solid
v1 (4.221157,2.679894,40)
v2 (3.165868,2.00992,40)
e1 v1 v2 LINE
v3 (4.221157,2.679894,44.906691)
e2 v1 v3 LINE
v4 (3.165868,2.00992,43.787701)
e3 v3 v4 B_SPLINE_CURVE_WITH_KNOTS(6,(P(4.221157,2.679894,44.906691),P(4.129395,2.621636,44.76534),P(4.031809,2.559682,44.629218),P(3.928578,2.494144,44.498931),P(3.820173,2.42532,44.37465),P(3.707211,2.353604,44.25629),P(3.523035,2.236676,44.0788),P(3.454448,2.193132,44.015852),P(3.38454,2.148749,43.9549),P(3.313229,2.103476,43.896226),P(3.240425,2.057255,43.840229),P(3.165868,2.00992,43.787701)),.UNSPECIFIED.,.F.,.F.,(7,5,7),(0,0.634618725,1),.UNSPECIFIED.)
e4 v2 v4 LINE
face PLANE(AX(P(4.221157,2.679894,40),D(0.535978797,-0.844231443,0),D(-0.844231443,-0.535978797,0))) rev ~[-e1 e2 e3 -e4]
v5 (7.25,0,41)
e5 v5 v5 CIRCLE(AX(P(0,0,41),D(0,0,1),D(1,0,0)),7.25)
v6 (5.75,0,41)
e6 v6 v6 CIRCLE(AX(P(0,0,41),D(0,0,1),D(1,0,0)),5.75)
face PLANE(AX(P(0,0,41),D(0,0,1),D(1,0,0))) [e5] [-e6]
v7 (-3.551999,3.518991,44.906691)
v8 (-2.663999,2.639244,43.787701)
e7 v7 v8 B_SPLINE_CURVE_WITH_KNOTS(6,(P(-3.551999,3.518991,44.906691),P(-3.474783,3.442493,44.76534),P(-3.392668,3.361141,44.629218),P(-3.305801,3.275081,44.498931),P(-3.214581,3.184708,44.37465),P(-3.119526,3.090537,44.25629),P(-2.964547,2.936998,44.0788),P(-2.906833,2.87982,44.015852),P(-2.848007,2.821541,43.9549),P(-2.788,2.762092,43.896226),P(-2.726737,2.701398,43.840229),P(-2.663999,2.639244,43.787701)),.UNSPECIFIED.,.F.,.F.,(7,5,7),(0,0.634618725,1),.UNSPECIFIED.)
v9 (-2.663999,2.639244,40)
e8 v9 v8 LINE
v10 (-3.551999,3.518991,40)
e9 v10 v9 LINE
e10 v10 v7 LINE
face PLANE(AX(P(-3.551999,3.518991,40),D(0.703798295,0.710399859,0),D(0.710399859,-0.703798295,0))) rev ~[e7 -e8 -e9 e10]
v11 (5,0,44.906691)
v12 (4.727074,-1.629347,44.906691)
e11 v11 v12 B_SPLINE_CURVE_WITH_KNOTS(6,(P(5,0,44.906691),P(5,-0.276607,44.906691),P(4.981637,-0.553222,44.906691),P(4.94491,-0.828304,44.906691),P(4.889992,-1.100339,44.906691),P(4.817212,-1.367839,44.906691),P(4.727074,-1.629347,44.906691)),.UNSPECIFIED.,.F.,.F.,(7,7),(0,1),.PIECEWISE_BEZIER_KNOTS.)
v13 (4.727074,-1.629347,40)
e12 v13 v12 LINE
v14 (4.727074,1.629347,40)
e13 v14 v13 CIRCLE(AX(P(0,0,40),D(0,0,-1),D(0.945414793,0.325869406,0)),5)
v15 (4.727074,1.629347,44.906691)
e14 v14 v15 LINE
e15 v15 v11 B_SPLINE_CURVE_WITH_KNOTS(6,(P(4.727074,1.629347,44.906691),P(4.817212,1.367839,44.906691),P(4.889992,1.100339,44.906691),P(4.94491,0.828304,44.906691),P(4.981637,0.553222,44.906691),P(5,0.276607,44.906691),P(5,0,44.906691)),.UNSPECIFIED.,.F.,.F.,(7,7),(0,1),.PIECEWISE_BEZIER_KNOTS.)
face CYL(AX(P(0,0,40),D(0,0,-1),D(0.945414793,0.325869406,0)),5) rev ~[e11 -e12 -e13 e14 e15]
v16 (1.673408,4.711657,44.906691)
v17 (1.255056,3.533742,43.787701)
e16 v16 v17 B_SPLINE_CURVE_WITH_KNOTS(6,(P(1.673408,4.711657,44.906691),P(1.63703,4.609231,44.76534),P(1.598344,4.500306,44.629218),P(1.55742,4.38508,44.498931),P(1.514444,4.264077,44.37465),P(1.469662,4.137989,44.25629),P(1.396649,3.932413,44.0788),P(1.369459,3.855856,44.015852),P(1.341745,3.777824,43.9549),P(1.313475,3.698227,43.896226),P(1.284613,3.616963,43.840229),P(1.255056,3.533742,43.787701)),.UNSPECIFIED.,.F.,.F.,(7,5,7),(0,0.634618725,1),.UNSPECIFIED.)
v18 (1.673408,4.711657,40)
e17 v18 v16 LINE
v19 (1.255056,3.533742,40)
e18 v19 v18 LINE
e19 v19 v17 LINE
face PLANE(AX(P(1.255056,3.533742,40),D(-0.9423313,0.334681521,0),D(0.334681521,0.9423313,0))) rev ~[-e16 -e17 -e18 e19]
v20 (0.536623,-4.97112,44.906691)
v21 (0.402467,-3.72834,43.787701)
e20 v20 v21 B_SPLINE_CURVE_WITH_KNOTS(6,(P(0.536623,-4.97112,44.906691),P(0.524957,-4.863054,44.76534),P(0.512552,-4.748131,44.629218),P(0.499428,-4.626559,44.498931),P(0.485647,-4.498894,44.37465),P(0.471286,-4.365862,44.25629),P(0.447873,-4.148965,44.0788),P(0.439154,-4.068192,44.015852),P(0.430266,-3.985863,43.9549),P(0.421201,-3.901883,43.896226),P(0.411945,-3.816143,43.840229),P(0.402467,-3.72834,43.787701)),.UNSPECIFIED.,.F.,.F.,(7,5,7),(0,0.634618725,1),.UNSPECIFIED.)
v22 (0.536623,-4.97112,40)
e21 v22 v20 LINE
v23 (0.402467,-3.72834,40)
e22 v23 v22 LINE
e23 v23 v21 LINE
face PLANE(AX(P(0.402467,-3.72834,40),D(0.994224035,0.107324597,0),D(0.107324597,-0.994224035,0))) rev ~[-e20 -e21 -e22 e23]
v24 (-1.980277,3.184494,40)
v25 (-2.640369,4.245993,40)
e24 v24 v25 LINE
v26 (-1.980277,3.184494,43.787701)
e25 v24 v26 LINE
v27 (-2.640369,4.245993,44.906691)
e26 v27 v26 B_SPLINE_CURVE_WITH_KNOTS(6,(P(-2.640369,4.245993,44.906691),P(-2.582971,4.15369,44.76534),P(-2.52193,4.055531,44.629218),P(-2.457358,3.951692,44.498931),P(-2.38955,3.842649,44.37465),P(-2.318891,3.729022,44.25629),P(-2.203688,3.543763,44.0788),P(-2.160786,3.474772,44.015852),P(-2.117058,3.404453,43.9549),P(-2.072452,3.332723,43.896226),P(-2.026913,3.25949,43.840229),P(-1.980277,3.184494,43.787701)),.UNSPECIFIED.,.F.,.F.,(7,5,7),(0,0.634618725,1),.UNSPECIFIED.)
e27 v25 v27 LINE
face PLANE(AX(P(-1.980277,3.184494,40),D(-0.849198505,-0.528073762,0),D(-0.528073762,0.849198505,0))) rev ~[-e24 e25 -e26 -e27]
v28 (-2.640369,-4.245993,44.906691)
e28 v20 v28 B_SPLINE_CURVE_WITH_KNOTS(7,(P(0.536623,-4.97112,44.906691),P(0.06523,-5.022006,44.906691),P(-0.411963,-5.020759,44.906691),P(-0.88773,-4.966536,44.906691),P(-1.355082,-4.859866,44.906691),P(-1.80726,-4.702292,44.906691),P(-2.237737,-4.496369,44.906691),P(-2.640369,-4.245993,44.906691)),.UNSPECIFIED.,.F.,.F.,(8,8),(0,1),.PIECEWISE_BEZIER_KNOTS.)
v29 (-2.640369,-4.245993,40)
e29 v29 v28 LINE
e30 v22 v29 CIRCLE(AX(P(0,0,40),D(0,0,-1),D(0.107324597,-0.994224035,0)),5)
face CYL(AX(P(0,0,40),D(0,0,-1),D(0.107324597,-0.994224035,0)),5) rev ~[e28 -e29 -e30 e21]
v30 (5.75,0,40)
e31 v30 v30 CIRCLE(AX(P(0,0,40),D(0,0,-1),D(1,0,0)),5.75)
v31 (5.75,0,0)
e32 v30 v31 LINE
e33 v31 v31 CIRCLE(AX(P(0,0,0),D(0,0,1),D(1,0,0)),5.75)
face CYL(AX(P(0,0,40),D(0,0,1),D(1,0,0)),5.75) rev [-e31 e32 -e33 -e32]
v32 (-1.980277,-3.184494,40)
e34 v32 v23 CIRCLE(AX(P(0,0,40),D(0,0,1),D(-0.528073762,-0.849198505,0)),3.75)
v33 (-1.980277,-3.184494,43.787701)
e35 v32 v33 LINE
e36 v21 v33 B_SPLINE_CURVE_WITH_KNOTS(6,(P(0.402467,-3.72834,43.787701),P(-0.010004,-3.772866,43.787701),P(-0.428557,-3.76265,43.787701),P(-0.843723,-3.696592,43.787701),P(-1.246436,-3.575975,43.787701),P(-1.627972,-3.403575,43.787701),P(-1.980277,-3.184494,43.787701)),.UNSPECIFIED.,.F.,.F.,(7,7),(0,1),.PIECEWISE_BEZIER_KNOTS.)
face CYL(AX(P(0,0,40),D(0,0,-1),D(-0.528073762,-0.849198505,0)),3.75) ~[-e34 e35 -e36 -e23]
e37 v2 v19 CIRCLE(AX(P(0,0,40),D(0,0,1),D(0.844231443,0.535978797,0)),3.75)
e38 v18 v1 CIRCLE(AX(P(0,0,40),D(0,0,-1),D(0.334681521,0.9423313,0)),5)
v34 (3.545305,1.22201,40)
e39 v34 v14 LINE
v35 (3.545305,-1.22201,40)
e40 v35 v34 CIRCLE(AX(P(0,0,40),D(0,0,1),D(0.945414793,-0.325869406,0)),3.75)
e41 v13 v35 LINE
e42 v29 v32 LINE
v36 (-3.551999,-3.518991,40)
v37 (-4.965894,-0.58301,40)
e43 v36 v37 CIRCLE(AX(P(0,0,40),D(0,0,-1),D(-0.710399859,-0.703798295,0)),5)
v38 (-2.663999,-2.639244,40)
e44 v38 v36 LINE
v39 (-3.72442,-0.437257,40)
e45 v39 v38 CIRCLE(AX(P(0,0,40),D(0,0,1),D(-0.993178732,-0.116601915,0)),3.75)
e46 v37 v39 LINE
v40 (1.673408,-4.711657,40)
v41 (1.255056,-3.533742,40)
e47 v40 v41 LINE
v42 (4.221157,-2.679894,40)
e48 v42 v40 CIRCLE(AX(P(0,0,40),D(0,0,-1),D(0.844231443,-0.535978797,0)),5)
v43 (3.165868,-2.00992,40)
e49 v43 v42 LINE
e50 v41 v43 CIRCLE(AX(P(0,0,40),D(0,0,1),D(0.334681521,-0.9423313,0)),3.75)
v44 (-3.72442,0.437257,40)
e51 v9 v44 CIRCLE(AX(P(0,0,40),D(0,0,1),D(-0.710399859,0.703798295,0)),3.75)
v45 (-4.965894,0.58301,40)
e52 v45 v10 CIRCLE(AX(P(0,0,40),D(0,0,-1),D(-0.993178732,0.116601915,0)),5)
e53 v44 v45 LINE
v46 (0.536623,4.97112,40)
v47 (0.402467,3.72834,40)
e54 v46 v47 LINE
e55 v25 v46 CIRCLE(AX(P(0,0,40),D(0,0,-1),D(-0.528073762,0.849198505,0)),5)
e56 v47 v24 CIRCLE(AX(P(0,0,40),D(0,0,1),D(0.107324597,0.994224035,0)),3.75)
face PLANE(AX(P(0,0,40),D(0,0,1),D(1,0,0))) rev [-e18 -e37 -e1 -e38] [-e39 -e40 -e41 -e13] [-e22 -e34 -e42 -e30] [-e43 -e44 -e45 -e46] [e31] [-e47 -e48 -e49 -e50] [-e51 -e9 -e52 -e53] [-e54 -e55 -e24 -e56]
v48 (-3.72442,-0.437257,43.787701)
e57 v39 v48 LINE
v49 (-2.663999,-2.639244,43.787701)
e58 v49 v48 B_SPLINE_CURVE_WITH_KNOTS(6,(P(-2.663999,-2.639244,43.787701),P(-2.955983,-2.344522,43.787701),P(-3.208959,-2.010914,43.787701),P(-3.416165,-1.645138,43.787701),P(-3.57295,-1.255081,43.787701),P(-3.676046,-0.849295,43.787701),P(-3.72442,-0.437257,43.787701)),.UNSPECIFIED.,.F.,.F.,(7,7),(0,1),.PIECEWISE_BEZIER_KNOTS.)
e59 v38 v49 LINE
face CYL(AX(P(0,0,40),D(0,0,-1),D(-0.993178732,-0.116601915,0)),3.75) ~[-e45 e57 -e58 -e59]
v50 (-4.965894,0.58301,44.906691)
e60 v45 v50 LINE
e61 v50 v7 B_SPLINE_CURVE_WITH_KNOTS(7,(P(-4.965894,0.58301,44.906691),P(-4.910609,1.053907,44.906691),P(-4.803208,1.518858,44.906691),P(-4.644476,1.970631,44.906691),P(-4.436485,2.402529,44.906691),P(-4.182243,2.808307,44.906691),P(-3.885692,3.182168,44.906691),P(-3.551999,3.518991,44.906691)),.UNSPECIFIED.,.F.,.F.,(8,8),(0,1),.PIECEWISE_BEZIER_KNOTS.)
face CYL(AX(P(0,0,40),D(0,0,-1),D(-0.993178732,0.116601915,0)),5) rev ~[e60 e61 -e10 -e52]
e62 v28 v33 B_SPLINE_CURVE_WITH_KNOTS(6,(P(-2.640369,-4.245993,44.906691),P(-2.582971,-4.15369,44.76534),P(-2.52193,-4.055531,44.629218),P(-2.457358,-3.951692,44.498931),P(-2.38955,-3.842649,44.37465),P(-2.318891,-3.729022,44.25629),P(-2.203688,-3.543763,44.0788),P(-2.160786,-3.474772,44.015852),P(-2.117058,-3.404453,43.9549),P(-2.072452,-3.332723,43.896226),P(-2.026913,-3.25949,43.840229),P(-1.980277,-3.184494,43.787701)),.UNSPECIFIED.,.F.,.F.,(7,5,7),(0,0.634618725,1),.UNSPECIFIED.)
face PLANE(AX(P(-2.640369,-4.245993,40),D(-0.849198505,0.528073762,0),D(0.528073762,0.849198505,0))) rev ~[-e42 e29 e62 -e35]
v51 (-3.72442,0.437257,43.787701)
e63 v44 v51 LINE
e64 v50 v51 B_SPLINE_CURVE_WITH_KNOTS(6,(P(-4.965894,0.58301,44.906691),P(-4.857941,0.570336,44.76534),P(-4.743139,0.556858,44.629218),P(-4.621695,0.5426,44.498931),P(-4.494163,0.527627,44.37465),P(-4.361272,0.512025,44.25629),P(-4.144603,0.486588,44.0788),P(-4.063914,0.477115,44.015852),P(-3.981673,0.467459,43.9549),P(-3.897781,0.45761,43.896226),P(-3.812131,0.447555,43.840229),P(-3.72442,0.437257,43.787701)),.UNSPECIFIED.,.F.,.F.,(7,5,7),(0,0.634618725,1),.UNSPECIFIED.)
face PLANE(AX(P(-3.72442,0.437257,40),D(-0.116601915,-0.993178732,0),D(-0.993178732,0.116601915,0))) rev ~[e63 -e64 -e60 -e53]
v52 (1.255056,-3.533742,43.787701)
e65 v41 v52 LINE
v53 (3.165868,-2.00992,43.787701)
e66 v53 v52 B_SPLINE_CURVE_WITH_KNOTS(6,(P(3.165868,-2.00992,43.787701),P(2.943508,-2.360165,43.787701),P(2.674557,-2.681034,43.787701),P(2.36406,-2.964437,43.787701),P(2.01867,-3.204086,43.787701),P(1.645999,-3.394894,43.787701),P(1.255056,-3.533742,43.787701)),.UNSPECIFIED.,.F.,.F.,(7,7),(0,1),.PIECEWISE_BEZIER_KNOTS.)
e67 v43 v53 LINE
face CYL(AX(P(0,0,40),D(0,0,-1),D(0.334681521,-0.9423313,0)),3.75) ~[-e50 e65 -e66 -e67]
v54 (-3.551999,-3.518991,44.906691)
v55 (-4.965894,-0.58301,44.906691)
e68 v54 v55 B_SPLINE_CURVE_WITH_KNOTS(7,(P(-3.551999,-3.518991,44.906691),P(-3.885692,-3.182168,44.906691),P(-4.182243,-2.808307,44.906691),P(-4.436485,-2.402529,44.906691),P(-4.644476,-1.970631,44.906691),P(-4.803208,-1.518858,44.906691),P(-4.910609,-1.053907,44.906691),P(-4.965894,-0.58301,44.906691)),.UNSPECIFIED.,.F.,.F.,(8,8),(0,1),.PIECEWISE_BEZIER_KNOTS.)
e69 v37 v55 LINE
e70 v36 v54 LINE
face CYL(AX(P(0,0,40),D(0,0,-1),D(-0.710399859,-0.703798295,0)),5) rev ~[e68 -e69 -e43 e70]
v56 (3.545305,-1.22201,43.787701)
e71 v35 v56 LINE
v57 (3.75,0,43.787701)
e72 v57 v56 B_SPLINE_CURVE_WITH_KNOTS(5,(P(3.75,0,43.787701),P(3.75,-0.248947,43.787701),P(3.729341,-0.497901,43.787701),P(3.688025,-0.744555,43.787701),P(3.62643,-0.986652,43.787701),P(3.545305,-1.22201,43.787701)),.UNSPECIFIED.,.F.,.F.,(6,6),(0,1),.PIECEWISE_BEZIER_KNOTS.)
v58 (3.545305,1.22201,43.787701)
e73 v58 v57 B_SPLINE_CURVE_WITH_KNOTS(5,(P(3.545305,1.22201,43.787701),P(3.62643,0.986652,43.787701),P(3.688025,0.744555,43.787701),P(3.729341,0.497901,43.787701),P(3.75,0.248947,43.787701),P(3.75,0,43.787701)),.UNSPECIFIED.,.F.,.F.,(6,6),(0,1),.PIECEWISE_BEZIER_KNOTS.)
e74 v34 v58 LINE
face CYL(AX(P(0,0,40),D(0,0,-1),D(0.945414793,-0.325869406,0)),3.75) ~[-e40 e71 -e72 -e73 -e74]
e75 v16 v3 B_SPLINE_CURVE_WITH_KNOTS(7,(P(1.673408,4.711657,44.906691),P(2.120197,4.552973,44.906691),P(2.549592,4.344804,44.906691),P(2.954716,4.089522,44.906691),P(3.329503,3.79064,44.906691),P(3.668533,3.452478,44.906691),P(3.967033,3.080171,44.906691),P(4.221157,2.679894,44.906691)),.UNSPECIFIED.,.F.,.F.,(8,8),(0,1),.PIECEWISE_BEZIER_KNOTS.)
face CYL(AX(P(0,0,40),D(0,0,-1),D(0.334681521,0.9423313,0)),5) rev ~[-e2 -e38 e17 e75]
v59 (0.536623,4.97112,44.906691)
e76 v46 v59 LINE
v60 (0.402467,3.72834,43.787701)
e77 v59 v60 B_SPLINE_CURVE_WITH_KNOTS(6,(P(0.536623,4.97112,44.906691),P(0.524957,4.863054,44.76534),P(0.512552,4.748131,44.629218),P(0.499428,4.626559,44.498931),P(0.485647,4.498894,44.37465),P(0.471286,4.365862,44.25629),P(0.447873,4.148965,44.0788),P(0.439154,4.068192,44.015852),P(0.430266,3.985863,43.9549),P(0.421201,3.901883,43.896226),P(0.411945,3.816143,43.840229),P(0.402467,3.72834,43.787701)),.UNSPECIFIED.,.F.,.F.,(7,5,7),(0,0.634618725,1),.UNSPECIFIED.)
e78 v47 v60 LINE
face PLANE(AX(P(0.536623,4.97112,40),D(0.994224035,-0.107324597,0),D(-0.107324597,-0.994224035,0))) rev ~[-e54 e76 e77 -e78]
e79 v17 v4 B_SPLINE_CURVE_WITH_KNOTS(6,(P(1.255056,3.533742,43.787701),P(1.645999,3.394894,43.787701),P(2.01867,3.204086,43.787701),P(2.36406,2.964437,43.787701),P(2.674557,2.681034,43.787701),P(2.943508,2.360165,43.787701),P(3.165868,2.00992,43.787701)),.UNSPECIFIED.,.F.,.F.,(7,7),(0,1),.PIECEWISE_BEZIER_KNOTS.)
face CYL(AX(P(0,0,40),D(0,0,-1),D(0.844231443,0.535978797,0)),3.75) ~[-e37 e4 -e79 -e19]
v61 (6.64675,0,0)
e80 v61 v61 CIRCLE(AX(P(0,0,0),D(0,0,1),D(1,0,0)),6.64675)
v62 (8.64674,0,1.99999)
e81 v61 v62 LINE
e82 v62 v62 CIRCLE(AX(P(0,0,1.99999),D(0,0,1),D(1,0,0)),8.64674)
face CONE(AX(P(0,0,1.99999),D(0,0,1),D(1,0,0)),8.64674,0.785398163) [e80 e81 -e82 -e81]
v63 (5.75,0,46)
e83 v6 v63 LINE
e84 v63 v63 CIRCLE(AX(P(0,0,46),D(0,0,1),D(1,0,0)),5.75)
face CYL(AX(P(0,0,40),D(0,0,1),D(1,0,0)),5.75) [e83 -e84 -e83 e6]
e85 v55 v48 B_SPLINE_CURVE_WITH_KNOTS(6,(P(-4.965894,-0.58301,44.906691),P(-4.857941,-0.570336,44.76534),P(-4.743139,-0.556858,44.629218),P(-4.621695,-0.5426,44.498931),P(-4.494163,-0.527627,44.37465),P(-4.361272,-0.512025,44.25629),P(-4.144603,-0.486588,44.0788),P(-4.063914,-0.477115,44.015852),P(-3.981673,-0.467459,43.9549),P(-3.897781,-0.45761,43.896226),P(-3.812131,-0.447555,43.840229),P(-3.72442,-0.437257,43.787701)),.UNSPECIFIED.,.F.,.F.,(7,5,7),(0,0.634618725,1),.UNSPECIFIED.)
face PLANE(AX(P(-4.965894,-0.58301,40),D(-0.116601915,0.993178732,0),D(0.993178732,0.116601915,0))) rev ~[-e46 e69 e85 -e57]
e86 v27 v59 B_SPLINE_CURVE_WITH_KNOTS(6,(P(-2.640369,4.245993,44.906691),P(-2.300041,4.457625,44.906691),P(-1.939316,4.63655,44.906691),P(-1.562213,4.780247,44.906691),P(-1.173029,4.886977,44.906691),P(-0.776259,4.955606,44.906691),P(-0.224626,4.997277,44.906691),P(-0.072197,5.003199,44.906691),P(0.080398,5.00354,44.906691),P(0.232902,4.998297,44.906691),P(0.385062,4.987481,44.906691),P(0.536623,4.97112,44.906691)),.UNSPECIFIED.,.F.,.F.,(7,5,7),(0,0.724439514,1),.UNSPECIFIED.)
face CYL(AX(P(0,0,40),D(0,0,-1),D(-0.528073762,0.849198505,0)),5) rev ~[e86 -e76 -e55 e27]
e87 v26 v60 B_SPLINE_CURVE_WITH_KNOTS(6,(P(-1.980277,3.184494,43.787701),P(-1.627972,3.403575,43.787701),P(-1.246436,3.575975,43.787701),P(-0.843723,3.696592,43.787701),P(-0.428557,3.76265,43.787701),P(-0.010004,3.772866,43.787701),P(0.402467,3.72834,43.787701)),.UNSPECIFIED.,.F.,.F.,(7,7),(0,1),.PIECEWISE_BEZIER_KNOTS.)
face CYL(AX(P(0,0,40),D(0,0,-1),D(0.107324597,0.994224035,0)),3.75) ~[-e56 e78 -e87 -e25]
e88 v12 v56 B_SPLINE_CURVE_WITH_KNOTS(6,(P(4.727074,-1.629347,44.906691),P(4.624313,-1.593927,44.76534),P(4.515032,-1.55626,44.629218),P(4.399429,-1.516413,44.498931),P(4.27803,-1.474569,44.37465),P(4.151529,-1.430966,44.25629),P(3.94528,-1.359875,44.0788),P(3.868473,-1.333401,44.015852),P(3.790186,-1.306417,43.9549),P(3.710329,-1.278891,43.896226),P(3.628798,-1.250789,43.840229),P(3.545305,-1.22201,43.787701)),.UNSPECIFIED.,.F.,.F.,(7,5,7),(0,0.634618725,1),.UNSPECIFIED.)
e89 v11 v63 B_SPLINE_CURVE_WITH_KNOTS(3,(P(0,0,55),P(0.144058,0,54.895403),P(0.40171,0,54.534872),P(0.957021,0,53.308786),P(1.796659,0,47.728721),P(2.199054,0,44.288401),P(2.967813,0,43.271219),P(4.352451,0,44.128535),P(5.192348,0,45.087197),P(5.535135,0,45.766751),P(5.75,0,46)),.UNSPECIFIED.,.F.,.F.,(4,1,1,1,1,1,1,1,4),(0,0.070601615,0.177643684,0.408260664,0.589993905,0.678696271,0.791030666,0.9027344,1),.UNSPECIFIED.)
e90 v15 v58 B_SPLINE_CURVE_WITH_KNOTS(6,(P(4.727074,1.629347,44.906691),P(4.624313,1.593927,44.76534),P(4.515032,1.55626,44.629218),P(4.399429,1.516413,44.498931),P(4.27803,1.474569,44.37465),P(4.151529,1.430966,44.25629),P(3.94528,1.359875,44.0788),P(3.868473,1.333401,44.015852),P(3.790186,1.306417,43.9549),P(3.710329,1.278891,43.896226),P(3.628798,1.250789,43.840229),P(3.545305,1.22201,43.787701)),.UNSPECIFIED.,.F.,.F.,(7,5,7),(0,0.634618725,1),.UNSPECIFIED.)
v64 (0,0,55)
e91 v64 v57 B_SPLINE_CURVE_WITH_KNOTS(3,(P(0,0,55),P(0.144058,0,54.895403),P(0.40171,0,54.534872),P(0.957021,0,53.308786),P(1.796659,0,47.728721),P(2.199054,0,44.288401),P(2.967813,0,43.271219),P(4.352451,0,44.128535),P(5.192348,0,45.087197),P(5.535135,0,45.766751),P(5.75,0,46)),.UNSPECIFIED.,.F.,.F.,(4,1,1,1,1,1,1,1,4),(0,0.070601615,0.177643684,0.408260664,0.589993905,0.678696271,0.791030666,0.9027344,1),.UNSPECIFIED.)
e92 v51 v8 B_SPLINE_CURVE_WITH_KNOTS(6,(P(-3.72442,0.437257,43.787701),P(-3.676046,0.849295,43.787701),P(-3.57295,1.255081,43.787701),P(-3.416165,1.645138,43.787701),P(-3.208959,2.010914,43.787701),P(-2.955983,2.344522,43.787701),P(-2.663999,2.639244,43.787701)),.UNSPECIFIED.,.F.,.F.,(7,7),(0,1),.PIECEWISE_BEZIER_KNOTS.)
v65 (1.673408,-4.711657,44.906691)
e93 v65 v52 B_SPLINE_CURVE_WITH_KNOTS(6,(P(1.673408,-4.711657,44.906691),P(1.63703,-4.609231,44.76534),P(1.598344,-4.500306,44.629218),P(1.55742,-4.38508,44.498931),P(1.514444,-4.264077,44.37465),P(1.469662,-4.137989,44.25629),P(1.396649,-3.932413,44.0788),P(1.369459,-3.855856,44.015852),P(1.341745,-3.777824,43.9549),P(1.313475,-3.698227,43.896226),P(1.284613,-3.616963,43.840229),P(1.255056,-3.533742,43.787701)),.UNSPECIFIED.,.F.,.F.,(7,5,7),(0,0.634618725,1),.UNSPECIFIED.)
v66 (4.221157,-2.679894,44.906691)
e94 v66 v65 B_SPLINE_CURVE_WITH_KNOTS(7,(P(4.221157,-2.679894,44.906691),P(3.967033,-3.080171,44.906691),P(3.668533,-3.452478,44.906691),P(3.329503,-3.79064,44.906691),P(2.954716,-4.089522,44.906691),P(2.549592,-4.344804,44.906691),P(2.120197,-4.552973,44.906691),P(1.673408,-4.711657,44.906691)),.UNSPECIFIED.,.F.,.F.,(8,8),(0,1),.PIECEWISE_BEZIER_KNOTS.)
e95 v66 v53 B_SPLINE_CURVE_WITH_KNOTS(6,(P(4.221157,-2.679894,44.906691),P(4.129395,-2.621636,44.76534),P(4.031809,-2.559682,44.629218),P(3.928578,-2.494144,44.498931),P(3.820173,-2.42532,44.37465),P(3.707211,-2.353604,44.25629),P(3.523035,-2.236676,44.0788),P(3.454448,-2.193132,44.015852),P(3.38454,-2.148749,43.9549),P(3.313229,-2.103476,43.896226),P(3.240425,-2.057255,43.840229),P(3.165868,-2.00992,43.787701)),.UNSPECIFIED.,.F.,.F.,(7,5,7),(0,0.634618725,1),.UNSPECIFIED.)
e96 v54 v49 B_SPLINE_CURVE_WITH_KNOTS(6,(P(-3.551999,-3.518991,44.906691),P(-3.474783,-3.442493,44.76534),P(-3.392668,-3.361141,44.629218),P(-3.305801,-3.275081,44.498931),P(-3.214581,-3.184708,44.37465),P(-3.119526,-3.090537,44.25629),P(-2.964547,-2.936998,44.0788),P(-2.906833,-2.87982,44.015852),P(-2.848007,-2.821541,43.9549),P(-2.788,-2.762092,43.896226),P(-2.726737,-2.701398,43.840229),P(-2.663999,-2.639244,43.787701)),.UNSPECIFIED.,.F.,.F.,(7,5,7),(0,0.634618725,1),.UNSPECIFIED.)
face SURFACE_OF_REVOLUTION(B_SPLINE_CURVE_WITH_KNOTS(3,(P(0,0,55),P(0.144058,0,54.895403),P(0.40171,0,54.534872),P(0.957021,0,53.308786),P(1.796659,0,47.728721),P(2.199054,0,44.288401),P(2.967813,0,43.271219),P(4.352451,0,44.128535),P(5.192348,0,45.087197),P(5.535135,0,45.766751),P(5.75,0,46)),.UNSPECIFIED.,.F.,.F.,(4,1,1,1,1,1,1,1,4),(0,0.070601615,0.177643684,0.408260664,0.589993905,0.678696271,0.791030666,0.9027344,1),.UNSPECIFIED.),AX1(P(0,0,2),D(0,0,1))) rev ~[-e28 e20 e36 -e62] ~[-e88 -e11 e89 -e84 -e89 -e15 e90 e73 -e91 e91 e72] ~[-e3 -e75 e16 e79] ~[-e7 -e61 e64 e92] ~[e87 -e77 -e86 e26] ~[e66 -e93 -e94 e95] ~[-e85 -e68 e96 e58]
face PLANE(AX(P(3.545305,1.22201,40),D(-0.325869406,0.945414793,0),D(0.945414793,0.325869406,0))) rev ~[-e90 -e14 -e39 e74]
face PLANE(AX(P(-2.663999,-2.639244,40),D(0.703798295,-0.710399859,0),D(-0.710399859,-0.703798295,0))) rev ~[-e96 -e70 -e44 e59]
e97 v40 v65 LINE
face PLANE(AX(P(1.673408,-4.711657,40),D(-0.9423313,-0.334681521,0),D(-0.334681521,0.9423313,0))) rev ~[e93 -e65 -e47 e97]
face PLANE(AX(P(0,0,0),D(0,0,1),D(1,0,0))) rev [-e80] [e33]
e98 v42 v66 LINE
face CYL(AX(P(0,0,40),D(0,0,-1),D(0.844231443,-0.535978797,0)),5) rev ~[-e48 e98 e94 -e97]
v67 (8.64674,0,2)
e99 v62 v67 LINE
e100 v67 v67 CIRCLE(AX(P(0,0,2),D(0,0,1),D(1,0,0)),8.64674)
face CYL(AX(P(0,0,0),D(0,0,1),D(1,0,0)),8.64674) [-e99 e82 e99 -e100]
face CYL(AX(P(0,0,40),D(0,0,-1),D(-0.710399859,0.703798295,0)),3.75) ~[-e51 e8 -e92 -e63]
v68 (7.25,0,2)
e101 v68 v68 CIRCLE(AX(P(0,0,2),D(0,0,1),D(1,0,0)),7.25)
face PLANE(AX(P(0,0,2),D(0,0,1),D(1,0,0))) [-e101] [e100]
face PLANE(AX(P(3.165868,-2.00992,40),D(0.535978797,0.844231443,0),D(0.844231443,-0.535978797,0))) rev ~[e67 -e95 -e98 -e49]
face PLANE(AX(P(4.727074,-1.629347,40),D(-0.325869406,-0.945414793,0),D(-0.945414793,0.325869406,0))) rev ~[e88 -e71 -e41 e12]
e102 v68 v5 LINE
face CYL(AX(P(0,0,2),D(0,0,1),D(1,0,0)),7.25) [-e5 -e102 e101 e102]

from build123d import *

# Parameters (mm, degrees)
F2_SIZE2  = 1.99999
F2_SIZE   = 1.99999
F5_R      = 5.75
F6_DEPTH  = 25
F7_R      = 5.75
F8_DEPTH  = 25
F10_DEPTH = 25


# Not quite as in the source:
# - a fillet or chamfer is up to 0.001 mm smaller than in the source, because OpenCascade refuses the exact size


with BuildPart() as f1:
    # F0 (on Front) → F1 (revolve)
    with BuildSketch(Plane.XZ):
        with BuildLine():
            Line((8.64674, 2), (7.25, 2))
            Line((7.25, 2), (7.25, 41))
            Line((7.25, 41), (5.75, 41))
            Line((5.75, 41), (5.75, 40))
            Line((5.75, 40), (4.75, 40))
            Line((4.75, 40), (4.75, 39))
            ThreePointArc((4.75, 39), (5.4571067812, 38.7071067812), (5.75, 38))
            Line((5.75, 38), (5.75, 4.9999998882))
            ThreePointArc((5.75, 4.9999998882), (5.4571067812, 4.2928931071), (4.75, 3.9999998882))
            Line((4.75, 3.9999998882), (4.75, 2.9999998882))
            Line((4.75, 2.9999998882), (5.75, 2.9999998882))
            Line((5.75, 2.9999998882), (5.75, 0))
            Line((5.75, 0), (8.64674, 0))
            Line((8.64674, 0), (8.64674, 2))
        make_face()
    revolve(axis=Axis((0, 0, 27.7979653329), (0, 0, 1)))

    # F2 (size 2 and 2 in the source; OpenCascade refuses exactly that, so slightly less here)
    f2_edges = [f1.edges().sort_by_distance(p)[0] for p in [
        (-8.64674, 0, 0),
    ]]
    chamfer(f2_edges, length=F2_SIZE, length2=F2_SIZE2)

    # F3 (on Front) → F4 (revolve)
    with BuildSketch(Plane.XZ):
        with BuildLine():
            Line((0, 55), (0, 41))
            Line((0, 41), (0, 40))
            Line((0, 40), (5.75, 40))
            Line((5.75, 40), (5.75, 46))
            add(Edge.make_bspline(
                [(0, 55), (0.1440579667, 54.8954034218), (0.4017096448, 54.5348723025), (0.9570213075, 53.3087861702), (1.7966593586, 47.7287211885), (2.1990543329, 44.2884011591), (2.9678127556, 43.2712194265), (4.3524509198, 44.1285353141), (5.1923480343, 45.0871969322), (5.5351351682, 45.7667505271), (5.75, 46)],
                knots=[0, 0, 0, 0, 0.0706016145, 0.1776436842, 0.4082606642, 0.5899939047, 0.6786962714, 0.7910306665, 0.9027344001, 1, 1, 1, 1], degree=3))
        make_face()
    revolve(axis=Axis((0, 0, 2), (0, 0, 1)))

    # F5 (on face) → F6 (cut)
    with BuildSketch(Plane(origin=(0, 0, 40), x_dir=(1, 0, 0), z_dir=(0, 0, -1))):
        Circle(F5_R)
    extrude(amount=F6_DEPTH, mode=Mode.SUBTRACT)

    # F7 (on face) → F8 (cut)
    with BuildSketch(Plane(origin=(0, 0, 2.9999998882), x_dir=(1, 0, 0), z_dir=(0, 0, -1))):
        Circle(F7_R)
    extrude(amount=-F8_DEPTH, mode=Mode.SUBTRACT)

    # F9 (on face) → F10 (cut)
    with BuildSketch(Plane(origin=(0, 0, 40), x_dir=(1, 0, 0), z_dir=(0, 0, -1))):
        with BuildLine():
            ThreePointArc((3.5453054724, 1.222010273), (3.75, 0), (3.5453054724, -1.222010273))
            Line((3.5453054724, -1.222010273), (4.7270739632, -1.6293470307))
            ThreePointArc((4.7270739632, -1.6293470307), (5, 0), (4.7270739632, 1.6293470307))
            Line((4.7270739632, 1.6293470307), (3.5453054724, 1.222010273))
        make_face()
        with BuildLine():
            Line((3.1658679099, 2.0099204903), (4.2211572131, 2.6798939871))
            ThreePointArc((4.2211572131, 2.6798939871), (3.1174490093, 3.9091574123), (1.6734076042, 4.7116565017))
            Line((1.6734076042, 4.7116565017), (1.2550557032, 3.5337423763))
            ThreePointArc((1.2550557032, 3.5337423763), (2.338086757, 2.9318680593), (3.1658679099, 2.0099204903))
        make_face()
        with BuildLine():
            Line((0.4024672392, 3.7283401295), (0.5366229857, 4.9711201727))
            ThreePointArc((0.5366229857, 4.9711201727), (-1.1126046698, 4.8746395609), (-2.640368812, 4.2459925267))
            Line((-2.640368812, 4.2459925267), (-1.980276609, 3.184494395))
            ThreePointArc((-1.980276609, 3.184494395), (-0.8344535023, 3.6559796707), (0.4024672392, 3.7283401295))
        make_face()
        with BuildLine():
            Line((-2.6639994714, 2.6392436069), (-3.5519992951, 3.5189914759))
            ThreePointArc((-3.5519992951, 3.5189914759), (-4.5048443395, 2.1694186956), (-4.9658936591, 0.5830095766))
            Line((-4.9658936591, 0.5830095766), (-3.7244202443, 0.4372571824))
            ThreePointArc((-3.7244202443, 0.4372571824), (-3.3786332546, 1.6270640217), (-2.6639994714, 2.6392436069))
        make_face()
        with BuildLine():
            Line((-3.7244202443, -0.4372571824), (-4.9658936591, -0.5830095766))
            ThreePointArc((-4.9658936591, -0.5830095766), (-4.5048443395, -2.1694186956), (-3.5519992951, -3.5189914759))
            Line((-3.5519992951, -3.5189914759), (-2.6639994714, -2.6392436069))
            ThreePointArc((-2.6639994714, -2.6392436069), (-3.3786332546, -1.6270640217), (-3.7244202443, -0.4372571824))
        make_face()
        with BuildLine():
            Line((-1.980276609, -3.184494395), (-2.640368812, -4.2459925267))
            ThreePointArc((-2.640368812, -4.2459925267), (-1.1126046698, -4.8746395609), (0.5366229857, -4.9711201727))
            Line((0.5366229857, -4.9711201727), (0.4024672392, -3.7283401295))
            ThreePointArc((0.4024672392, -3.7283401295), (-0.8344535023, -3.6559796707), (-1.980276609, -3.184494395))
        make_face()
        with BuildLine():
            Line((1.2550557032, -3.5337423763), (1.6734076042, -4.7116565017))
            ThreePointArc((1.6734076042, -4.7116565017), (3.1174490093, -3.9091574123), (4.2211572131, -2.6798939871))
            Line((4.2211572131, -2.6798939871), (3.1658679099, -2.0099204903))
            ThreePointArc((3.1658679099, -2.0099204903), (2.338086757, -2.9318680593), (1.2550557032, -3.5337423763))
        make_face()
    extrude(amount=-F10_DEPTH, mode=Mode.SUBTRACT)


solid = f1.part
